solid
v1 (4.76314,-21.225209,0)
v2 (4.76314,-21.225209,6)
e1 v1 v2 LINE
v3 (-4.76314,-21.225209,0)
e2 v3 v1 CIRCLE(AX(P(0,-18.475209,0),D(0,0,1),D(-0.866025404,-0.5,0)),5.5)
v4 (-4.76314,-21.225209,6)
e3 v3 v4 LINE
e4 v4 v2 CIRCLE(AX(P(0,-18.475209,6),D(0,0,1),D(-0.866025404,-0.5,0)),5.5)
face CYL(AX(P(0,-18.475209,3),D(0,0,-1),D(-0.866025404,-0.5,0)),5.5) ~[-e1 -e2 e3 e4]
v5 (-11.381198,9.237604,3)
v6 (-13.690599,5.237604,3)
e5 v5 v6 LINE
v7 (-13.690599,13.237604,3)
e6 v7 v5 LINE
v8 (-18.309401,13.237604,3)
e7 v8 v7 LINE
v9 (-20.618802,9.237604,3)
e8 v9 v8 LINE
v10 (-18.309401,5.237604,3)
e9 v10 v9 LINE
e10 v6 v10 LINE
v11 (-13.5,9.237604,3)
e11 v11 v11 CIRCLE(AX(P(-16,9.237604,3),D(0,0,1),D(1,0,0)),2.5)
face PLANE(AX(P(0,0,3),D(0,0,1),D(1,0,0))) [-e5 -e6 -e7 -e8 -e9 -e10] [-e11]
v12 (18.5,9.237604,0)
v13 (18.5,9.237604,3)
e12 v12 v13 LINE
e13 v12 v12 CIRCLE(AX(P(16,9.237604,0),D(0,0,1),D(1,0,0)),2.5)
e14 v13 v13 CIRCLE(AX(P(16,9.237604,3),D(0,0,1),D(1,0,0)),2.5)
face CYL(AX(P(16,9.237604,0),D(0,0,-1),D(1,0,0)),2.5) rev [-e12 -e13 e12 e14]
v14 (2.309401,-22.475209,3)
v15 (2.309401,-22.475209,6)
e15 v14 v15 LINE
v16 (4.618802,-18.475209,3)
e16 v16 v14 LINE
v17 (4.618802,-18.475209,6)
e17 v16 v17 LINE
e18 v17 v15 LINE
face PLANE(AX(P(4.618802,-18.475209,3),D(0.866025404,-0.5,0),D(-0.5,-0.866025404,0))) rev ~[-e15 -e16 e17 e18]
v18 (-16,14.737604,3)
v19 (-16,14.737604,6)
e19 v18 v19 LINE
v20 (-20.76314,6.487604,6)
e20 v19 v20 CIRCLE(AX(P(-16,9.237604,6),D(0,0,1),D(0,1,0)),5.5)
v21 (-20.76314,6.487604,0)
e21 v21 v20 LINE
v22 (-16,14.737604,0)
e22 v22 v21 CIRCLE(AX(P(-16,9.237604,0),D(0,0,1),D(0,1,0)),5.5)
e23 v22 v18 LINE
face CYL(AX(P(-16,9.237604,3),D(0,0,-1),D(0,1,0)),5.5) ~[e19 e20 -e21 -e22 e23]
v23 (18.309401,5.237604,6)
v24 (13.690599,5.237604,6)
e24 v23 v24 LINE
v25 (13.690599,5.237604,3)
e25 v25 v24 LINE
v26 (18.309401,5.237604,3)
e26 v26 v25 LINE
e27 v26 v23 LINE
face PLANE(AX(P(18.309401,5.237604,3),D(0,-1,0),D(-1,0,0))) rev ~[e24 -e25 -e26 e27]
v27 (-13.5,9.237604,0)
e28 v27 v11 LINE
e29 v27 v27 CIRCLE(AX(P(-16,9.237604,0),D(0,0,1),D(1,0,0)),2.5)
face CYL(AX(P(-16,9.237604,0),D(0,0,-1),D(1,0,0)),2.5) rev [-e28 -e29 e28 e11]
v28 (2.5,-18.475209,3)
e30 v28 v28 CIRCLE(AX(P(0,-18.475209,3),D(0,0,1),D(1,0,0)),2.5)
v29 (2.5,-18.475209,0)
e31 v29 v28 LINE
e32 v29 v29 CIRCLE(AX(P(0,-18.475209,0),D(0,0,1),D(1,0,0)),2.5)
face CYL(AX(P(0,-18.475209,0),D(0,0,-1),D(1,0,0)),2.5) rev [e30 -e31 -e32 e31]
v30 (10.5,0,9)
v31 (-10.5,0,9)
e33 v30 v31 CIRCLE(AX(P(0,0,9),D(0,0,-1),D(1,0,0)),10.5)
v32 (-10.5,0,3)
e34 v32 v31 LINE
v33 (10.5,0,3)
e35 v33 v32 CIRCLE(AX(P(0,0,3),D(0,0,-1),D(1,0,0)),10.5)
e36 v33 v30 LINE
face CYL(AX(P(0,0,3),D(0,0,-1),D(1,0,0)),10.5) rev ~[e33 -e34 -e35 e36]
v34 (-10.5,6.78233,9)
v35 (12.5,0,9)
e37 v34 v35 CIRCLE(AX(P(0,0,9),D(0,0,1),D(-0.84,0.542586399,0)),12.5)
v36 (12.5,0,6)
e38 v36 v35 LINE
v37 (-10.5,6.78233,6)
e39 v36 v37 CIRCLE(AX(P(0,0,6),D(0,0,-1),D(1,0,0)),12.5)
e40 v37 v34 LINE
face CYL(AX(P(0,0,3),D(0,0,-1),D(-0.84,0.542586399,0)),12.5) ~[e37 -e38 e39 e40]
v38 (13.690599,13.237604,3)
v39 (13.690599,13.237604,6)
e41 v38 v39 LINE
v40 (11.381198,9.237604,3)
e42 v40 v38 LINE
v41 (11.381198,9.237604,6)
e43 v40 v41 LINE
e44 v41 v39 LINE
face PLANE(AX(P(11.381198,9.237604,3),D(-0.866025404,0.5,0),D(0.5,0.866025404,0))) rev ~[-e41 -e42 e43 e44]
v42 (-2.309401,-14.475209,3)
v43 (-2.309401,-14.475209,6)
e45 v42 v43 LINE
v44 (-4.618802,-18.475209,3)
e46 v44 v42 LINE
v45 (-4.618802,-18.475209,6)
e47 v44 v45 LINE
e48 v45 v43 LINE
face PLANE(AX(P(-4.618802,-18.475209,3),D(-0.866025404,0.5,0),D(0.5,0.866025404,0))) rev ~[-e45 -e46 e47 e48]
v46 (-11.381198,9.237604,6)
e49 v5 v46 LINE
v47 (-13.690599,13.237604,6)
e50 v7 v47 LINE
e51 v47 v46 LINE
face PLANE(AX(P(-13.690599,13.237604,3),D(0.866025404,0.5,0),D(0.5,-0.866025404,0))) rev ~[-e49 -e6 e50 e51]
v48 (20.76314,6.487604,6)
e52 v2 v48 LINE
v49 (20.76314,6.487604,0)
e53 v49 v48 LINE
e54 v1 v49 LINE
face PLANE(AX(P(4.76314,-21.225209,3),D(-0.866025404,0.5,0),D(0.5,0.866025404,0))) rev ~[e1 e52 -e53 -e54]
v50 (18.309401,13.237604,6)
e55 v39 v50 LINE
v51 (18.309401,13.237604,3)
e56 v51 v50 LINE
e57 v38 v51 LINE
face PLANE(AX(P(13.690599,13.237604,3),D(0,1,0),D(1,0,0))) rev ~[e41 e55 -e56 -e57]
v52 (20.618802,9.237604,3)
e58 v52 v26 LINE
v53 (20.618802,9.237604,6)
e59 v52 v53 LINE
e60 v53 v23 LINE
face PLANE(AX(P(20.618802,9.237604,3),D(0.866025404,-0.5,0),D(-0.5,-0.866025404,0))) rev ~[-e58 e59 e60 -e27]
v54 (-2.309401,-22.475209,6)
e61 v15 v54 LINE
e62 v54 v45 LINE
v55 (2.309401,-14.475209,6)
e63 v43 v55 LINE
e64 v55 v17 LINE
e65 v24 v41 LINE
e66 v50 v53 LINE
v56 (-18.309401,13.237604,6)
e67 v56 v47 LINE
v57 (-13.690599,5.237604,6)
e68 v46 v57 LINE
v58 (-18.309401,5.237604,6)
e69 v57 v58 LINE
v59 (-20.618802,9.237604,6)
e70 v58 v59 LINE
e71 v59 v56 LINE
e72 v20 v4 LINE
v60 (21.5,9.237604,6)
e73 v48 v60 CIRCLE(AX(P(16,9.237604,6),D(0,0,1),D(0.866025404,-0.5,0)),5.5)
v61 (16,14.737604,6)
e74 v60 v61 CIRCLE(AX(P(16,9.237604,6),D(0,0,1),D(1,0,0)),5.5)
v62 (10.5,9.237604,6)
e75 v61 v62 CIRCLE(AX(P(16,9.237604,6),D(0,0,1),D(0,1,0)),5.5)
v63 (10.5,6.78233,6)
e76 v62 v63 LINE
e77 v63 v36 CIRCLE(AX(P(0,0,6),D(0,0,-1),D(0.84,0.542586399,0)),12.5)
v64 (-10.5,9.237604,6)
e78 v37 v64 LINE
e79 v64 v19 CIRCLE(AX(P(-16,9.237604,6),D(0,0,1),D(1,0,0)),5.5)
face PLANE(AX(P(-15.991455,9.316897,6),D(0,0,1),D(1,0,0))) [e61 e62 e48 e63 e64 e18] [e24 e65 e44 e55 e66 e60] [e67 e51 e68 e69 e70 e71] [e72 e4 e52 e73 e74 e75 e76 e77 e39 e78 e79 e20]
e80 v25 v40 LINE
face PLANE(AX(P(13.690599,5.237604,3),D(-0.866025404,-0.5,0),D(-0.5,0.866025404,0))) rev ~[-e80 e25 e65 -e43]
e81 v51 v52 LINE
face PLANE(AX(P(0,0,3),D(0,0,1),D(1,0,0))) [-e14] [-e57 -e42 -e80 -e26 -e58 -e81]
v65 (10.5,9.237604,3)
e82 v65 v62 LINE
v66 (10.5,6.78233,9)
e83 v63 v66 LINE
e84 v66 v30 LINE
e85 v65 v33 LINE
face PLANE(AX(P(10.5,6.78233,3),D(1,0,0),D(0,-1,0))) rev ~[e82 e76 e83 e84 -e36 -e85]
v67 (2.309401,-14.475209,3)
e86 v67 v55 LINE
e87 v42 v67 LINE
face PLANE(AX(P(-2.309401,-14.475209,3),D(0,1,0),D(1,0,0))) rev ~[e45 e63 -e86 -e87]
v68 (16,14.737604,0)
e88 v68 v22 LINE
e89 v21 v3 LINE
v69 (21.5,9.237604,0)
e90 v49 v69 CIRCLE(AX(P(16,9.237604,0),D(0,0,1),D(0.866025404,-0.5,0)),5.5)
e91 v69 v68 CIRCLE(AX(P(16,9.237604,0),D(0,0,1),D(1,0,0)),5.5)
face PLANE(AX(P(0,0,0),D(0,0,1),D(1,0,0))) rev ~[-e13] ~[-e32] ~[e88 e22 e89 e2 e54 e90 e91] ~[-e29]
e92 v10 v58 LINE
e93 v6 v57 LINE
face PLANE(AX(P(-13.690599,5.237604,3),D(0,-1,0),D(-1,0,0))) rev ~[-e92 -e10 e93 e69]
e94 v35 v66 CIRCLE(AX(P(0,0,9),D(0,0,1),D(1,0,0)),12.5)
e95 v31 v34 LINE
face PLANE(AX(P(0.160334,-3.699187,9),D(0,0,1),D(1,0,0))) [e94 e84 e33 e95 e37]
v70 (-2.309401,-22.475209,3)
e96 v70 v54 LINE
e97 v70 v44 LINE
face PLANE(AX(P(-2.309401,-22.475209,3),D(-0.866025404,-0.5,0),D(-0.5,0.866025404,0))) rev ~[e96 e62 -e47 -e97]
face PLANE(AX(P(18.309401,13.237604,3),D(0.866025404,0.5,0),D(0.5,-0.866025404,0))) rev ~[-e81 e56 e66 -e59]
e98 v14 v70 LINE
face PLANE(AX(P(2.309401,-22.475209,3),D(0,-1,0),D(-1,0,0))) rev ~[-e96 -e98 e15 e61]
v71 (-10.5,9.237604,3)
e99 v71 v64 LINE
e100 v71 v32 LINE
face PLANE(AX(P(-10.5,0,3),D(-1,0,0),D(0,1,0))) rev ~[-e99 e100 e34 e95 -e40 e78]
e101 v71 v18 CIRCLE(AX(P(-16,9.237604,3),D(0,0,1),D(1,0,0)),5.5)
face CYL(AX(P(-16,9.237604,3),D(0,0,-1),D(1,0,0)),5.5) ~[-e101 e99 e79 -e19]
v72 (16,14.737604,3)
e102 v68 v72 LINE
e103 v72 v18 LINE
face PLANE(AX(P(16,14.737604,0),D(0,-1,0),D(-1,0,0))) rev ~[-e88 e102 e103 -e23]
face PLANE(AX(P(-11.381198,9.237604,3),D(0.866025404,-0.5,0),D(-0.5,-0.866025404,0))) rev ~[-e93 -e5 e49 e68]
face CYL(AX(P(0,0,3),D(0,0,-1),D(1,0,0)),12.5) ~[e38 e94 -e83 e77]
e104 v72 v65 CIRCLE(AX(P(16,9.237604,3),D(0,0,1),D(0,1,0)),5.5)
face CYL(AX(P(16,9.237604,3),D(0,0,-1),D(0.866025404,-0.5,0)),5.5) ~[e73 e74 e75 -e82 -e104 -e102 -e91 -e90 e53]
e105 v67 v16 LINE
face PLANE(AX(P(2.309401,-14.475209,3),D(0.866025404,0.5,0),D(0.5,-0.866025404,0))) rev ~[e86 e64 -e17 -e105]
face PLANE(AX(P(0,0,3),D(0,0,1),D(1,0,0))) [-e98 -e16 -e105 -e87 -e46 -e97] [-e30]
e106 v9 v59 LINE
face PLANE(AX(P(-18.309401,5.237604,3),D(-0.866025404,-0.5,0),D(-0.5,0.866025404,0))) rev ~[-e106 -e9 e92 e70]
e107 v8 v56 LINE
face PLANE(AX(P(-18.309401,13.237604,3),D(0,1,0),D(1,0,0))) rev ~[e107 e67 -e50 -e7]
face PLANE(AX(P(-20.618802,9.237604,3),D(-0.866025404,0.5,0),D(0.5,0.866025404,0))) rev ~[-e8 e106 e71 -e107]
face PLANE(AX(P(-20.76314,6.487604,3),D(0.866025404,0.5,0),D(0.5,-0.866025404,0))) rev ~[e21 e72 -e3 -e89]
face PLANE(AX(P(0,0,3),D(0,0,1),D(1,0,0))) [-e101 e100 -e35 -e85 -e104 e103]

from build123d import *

# Parameters (mm, degrees)
F0_R     = 2.5
F1_DEPTH = 3
F2_START = 3
F2_DEPTH = 3
F3_START = 3
F3_DEPTH = 6


# Not quite as in the source:
# - a feature names something its author has since deleted; it is built from what else it names


with BuildPart() as f1:
    # F0 (on Top) → F1 (new body)
    with BuildSketch(Plane.XY):
        with BuildLine():
            ThreePointArc((-10.5, 0), (0, -10.5), (10.5, 0))
            ThreePointArc((10.5, 0), (0, 10.5), (-10.5, 0))
        make_face()
        with BuildLine():
            Line((10.5, 9.237604307), (10.5, 6.7823299831))
            ThreePointArc((10.5, 6.7823299831), (11.9895788083, 3.5355339059), (12.5, 0))
            ThreePointArc((12.5, 0), (-3.5355339059, -11.9895788083), (-10.5, 6.7823299831))
            Line((-10.5, 6.7823299831), (-10.5, 9.237604307))
            ThreePointArc((-10.5, 9.237604307), (-14.5764952519, 3.9250122624), (-20.7631397208, 6.487604307))
            Line((-20.7631397208, 6.487604307), (-4.7631397208, -21.2252086141))
            ThreePointArc((-4.7631397208, -21.2252086141), (-1.4235047481, -13.1626165695), (5.5, -18.4752086141))
            ThreePointArc((5.5, -18.4752086141), (5.3125920446, -19.8987133621), (4.7631397208, -21.2252086141))
            Line((4.7631397208, -21.2252086141), (20.7631397208, 6.487604307))
            ThreePointArc((20.7631397208, 6.487604307), (14.5764952519, 3.9250122624), (10.5, 9.237604307))
        make_face()
        with BuildLine():
            ThreePointArc((16, 14.737604307), (12.1109127035, 13.1266916036), (10.5, 9.237604307))
            ThreePointArc((10.5, 9.237604307), (14.5764952519, 3.9250122624), (20.7631397208, 6.487604307))
            ThreePointArc((20.7631397208, 6.487604307), (21.3125920446, 7.814099559), (21.5, 9.237604307))
            ThreePointArc((21.5, 9.237604307), (19.8890872965, 13.1266916036), (16, 14.737604307))
        make_face()
        Polygon((11.3811978465, 9.237604307), (13.6905989232, 13.237604307), (18.3094010768, 13.237604307), (20.6188021535, 9.237604307), (18.3094010768, 5.237604307), (13.6905989232, 5.237604307), align=None, mode=Mode.SUBTRACT)
        with BuildLine():
            ThreePointArc((-20.7631397208, 6.487604307), (-14.5764952519, 3.9250122624), (-10.5, 9.237604307))
            ThreePointArc((-10.5, 9.237604307), (-12.1109127035, 13.1266916036), (-16, 14.737604307))
            ThreePointArc((-16, 14.737604307), (-20.7631397208, 11.987604307), (-20.7631397208, 6.487604307))
        make_face()
        Polygon((-18.3094010768, 13.237604307), (-13.6905989232, 13.237604307), (-11.3811978465, 9.237604307), (-13.6905989232, 5.237604307), (-18.3094010768, 5.237604307), (-20.6188021535, 9.237604307), align=None, mode=Mode.SUBTRACT)
        with BuildLine():
            ThreePointArc((-4.7631397208, -21.2252086141), (0, -23.9752086141), (4.7631397208, -21.2252086141))
            ThreePointArc((4.7631397208, -21.2252086141), (5.3125920446, -19.8987133621), (5.5, -18.4752086141))
            ThreePointArc((5.5, -18.4752086141), (-1.4235047481, -13.1626165695), (-4.7631397208, -21.2252086141))
        make_face()
        Polygon((-2.3094010768, -22.4752086141), (-4.6188021535, -18.4752086141), (-2.3094010768, -14.4752086141), (2.3094010768, -14.4752086141), (4.6188021535, -18.4752086141), (2.3094010768, -22.4752086141), align=None, mode=Mode.SUBTRACT)
        with BuildLine():
            Line((10.5, 6.7823299831), (10.5, 0))
            ThreePointArc((10.5, 0), (0, -10.5), (-10.5, 0))
            Line((-10.5, 0), (-10.5, 6.7823299831))
            ThreePointArc((-10.5, 6.7823299831), (-3.5355339059, -11.9895788083), (12.5, 0))
            ThreePointArc((12.5, 0), (11.9895788083, 3.5355339059), (10.5, 6.7823299831))
        make_face()
        with BuildLine():
            ThreePointArc((-10.5, 6.7823299831), (0, 12.5), (10.5, 6.7823299831))
            Line((10.5, 6.7823299831), (10.5, 9.237604307))
            Line((10.5, 9.237604307), (10.5, 14.737604307))
            Line((10.5, 14.737604307), (-10.5, 14.737604307))
            Line((-10.5, 14.737604307), (-10.5, 9.237604307))
            Line((-10.5, 9.237604307), (-10.5, 6.7823299831))
        make_face()
        Polygon((18.3094010768, 13.237604307), (13.6905989232, 13.237604307), (11.3811978465, 9.237604307), (13.6905989232, 5.237604307), (18.3094010768, 5.237604307), (20.6188021535, 9.237604307), align=None)
        with Locations((16, 9.237604307)):
            Circle(F0_R, mode=Mode.SUBTRACT)
        Polygon((-2.3094010768, -14.4752086141), (-4.6188021535, -18.4752086141), (-2.3094010768, -22.4752086141), (2.3094010768, -22.4752086141), (4.6188021535, -18.4752086141), (2.3094010768, -14.4752086141), align=None)
        with Locations((0, -18.4752086141)):
            Circle(F0_R, mode=Mode.SUBTRACT)
        Polygon((-11.3811978465, 9.237604307), (-13.6905989232, 13.237604307), (-18.3094010768, 13.237604307), (-20.6188021535, 9.237604307), (-18.3094010768, 5.237604307), (-13.6905989232, 5.237604307), align=None)
        with Locations((-16, 9.237604307)):
            Circle(F0_R, mode=Mode.SUBTRACT)
        with BuildLine():
            ThreePointArc((-10.5, 0), (0, 10.5), (10.5, 0))
            Line((10.5, 0), (10.5, 6.7823299831))
            ThreePointArc((10.5, 6.7823299831), (0, 12.5), (-10.5, 6.7823299831))
            Line((-10.5, 6.7823299831), (-10.5, 0))
        make_face()
        with BuildLine():
            Line((10.5, 14.737604307), (10.5, 9.237604307))
            ThreePointArc((10.5, 9.237604307), (12.1109127035, 13.1266916036), (16, 14.737604307))
            Line((16, 14.737604307), (10.5, 14.737604307))
        make_face()
        with BuildLine():
            ThreePointArc((-16, 14.737604307), (-12.1109127035, 13.1266916036), (-10.5, 9.237604307))
            Line((-10.5, 9.237604307), (-10.5, 14.737604307))
            Line((-10.5, 14.737604307), (-16, 14.737604307))
        make_face()
    extrude(amount=F1_DEPTH)

    # F0 (on Top) → F2 (join)
    with BuildSketch(Plane.XY.offset(F2_START)):
        with BuildLine():
            ThreePointArc((-20.7631397208, 6.487604307), (-14.5764952519, 3.9250122624), (-10.5, 9.237604307))
            ThreePointArc((-10.5, 9.237604307), (-12.1109127035, 13.1266916036), (-16, 14.737604307))
            ThreePointArc((-16, 14.737604307), (-20.7631397208, 11.987604307), (-20.7631397208, 6.487604307))
        make_face()
        Polygon((-18.3094010768, 13.237604307), (-13.6905989232, 13.237604307), (-11.3811978465, 9.237604307), (-13.6905989232, 5.237604307), (-18.3094010768, 5.237604307), (-20.6188021535, 9.237604307), align=None, mode=Mode.SUBTRACT)
        with BuildLine():
            ThreePointArc((-4.7631397208, -21.2252086141), (0, -23.9752086141), (4.7631397208, -21.2252086141))
            ThreePointArc((4.7631397208, -21.2252086141), (5.3125920446, -19.8987133621), (5.5, -18.4752086141))
            ThreePointArc((5.5, -18.4752086141), (-1.4235047481, -13.1626165695), (-4.7631397208, -21.2252086141))
        make_face()
        Polygon((-2.3094010768, -22.4752086141), (-4.6188021535, -18.4752086141), (-2.3094010768, -14.4752086141), (2.3094010768, -14.4752086141), (4.6188021535, -18.4752086141), (2.3094010768, -22.4752086141), align=None, mode=Mode.SUBTRACT)
        with BuildLine():
            ThreePointArc((16, 14.737604307), (12.1109127035, 13.1266916036), (10.5, 9.237604307))
            ThreePointArc((10.5, 9.237604307), (14.5764952519, 3.9250122624), (20.7631397208, 6.487604307))
            ThreePointArc((20.7631397208, 6.487604307), (21.3125920446, 7.814099559), (21.5, 9.237604307))
            ThreePointArc((21.5, 9.237604307), (19.8890872965, 13.1266916036), (16, 14.737604307))
        make_face()
        Polygon((11.3811978465, 9.237604307), (13.6905989232, 13.237604307), (18.3094010768, 13.237604307), (20.6188021535, 9.237604307), (18.3094010768, 5.237604307), (13.6905989232, 5.237604307), align=None, mode=Mode.SUBTRACT)
        with BuildLine():
            Line((10.5, 9.237604307), (10.5, 6.7823299831))
            ThreePointArc((10.5, 6.7823299831), (11.9895788083, 3.5355339059), (12.5, 0))
            ThreePointArc((12.5, 0), (-3.5355339059, -11.9895788083), (-10.5, 6.7823299831))
            Line((-10.5, 6.7823299831), (-10.5, 9.237604307))
            ThreePointArc((-10.5, 9.237604307), (-14.5764952519, 3.9250122624), (-20.7631397208, 6.487604307))
            Line((-20.7631397208, 6.487604307), (-4.7631397208, -21.2252086141))
            ThreePointArc((-4.7631397208, -21.2252086141), (-1.4235047481, -13.1626165695), (5.5, -18.4752086141))
            ThreePointArc((5.5, -18.4752086141), (5.3125920446, -19.8987133621), (4.7631397208, -21.2252086141))
            Line((4.7631397208, -21.2252086141), (20.7631397208, 6.487604307))
            ThreePointArc((20.7631397208, 6.487604307), (14.5764952519, 3.9250122624), (10.5, 9.237604307))
        make_face()
    extrude(amount=F2_DEPTH)

    # F0 (on Top) → F3 (join)
    with BuildSketch(Plane.XY.offset(F3_START)):
        with BuildLine():
            Line((10.5, 6.7823299831), (10.5, 0))
            ThreePointArc((10.5, 0), (0, -10.5), (-10.5, 0))
            Line((-10.5, 0), (-10.5, 6.7823299831))
            ThreePointArc((-10.5, 6.7823299831), (-3.5355339059, -11.9895788083), (12.5, 0))
            ThreePointArc((12.5, 0), (11.9895788083, 3.5355339059), (10.5, 6.7823299831))
        make_face()
    extrude(amount=F3_DEPTH)


solid = f1.part
